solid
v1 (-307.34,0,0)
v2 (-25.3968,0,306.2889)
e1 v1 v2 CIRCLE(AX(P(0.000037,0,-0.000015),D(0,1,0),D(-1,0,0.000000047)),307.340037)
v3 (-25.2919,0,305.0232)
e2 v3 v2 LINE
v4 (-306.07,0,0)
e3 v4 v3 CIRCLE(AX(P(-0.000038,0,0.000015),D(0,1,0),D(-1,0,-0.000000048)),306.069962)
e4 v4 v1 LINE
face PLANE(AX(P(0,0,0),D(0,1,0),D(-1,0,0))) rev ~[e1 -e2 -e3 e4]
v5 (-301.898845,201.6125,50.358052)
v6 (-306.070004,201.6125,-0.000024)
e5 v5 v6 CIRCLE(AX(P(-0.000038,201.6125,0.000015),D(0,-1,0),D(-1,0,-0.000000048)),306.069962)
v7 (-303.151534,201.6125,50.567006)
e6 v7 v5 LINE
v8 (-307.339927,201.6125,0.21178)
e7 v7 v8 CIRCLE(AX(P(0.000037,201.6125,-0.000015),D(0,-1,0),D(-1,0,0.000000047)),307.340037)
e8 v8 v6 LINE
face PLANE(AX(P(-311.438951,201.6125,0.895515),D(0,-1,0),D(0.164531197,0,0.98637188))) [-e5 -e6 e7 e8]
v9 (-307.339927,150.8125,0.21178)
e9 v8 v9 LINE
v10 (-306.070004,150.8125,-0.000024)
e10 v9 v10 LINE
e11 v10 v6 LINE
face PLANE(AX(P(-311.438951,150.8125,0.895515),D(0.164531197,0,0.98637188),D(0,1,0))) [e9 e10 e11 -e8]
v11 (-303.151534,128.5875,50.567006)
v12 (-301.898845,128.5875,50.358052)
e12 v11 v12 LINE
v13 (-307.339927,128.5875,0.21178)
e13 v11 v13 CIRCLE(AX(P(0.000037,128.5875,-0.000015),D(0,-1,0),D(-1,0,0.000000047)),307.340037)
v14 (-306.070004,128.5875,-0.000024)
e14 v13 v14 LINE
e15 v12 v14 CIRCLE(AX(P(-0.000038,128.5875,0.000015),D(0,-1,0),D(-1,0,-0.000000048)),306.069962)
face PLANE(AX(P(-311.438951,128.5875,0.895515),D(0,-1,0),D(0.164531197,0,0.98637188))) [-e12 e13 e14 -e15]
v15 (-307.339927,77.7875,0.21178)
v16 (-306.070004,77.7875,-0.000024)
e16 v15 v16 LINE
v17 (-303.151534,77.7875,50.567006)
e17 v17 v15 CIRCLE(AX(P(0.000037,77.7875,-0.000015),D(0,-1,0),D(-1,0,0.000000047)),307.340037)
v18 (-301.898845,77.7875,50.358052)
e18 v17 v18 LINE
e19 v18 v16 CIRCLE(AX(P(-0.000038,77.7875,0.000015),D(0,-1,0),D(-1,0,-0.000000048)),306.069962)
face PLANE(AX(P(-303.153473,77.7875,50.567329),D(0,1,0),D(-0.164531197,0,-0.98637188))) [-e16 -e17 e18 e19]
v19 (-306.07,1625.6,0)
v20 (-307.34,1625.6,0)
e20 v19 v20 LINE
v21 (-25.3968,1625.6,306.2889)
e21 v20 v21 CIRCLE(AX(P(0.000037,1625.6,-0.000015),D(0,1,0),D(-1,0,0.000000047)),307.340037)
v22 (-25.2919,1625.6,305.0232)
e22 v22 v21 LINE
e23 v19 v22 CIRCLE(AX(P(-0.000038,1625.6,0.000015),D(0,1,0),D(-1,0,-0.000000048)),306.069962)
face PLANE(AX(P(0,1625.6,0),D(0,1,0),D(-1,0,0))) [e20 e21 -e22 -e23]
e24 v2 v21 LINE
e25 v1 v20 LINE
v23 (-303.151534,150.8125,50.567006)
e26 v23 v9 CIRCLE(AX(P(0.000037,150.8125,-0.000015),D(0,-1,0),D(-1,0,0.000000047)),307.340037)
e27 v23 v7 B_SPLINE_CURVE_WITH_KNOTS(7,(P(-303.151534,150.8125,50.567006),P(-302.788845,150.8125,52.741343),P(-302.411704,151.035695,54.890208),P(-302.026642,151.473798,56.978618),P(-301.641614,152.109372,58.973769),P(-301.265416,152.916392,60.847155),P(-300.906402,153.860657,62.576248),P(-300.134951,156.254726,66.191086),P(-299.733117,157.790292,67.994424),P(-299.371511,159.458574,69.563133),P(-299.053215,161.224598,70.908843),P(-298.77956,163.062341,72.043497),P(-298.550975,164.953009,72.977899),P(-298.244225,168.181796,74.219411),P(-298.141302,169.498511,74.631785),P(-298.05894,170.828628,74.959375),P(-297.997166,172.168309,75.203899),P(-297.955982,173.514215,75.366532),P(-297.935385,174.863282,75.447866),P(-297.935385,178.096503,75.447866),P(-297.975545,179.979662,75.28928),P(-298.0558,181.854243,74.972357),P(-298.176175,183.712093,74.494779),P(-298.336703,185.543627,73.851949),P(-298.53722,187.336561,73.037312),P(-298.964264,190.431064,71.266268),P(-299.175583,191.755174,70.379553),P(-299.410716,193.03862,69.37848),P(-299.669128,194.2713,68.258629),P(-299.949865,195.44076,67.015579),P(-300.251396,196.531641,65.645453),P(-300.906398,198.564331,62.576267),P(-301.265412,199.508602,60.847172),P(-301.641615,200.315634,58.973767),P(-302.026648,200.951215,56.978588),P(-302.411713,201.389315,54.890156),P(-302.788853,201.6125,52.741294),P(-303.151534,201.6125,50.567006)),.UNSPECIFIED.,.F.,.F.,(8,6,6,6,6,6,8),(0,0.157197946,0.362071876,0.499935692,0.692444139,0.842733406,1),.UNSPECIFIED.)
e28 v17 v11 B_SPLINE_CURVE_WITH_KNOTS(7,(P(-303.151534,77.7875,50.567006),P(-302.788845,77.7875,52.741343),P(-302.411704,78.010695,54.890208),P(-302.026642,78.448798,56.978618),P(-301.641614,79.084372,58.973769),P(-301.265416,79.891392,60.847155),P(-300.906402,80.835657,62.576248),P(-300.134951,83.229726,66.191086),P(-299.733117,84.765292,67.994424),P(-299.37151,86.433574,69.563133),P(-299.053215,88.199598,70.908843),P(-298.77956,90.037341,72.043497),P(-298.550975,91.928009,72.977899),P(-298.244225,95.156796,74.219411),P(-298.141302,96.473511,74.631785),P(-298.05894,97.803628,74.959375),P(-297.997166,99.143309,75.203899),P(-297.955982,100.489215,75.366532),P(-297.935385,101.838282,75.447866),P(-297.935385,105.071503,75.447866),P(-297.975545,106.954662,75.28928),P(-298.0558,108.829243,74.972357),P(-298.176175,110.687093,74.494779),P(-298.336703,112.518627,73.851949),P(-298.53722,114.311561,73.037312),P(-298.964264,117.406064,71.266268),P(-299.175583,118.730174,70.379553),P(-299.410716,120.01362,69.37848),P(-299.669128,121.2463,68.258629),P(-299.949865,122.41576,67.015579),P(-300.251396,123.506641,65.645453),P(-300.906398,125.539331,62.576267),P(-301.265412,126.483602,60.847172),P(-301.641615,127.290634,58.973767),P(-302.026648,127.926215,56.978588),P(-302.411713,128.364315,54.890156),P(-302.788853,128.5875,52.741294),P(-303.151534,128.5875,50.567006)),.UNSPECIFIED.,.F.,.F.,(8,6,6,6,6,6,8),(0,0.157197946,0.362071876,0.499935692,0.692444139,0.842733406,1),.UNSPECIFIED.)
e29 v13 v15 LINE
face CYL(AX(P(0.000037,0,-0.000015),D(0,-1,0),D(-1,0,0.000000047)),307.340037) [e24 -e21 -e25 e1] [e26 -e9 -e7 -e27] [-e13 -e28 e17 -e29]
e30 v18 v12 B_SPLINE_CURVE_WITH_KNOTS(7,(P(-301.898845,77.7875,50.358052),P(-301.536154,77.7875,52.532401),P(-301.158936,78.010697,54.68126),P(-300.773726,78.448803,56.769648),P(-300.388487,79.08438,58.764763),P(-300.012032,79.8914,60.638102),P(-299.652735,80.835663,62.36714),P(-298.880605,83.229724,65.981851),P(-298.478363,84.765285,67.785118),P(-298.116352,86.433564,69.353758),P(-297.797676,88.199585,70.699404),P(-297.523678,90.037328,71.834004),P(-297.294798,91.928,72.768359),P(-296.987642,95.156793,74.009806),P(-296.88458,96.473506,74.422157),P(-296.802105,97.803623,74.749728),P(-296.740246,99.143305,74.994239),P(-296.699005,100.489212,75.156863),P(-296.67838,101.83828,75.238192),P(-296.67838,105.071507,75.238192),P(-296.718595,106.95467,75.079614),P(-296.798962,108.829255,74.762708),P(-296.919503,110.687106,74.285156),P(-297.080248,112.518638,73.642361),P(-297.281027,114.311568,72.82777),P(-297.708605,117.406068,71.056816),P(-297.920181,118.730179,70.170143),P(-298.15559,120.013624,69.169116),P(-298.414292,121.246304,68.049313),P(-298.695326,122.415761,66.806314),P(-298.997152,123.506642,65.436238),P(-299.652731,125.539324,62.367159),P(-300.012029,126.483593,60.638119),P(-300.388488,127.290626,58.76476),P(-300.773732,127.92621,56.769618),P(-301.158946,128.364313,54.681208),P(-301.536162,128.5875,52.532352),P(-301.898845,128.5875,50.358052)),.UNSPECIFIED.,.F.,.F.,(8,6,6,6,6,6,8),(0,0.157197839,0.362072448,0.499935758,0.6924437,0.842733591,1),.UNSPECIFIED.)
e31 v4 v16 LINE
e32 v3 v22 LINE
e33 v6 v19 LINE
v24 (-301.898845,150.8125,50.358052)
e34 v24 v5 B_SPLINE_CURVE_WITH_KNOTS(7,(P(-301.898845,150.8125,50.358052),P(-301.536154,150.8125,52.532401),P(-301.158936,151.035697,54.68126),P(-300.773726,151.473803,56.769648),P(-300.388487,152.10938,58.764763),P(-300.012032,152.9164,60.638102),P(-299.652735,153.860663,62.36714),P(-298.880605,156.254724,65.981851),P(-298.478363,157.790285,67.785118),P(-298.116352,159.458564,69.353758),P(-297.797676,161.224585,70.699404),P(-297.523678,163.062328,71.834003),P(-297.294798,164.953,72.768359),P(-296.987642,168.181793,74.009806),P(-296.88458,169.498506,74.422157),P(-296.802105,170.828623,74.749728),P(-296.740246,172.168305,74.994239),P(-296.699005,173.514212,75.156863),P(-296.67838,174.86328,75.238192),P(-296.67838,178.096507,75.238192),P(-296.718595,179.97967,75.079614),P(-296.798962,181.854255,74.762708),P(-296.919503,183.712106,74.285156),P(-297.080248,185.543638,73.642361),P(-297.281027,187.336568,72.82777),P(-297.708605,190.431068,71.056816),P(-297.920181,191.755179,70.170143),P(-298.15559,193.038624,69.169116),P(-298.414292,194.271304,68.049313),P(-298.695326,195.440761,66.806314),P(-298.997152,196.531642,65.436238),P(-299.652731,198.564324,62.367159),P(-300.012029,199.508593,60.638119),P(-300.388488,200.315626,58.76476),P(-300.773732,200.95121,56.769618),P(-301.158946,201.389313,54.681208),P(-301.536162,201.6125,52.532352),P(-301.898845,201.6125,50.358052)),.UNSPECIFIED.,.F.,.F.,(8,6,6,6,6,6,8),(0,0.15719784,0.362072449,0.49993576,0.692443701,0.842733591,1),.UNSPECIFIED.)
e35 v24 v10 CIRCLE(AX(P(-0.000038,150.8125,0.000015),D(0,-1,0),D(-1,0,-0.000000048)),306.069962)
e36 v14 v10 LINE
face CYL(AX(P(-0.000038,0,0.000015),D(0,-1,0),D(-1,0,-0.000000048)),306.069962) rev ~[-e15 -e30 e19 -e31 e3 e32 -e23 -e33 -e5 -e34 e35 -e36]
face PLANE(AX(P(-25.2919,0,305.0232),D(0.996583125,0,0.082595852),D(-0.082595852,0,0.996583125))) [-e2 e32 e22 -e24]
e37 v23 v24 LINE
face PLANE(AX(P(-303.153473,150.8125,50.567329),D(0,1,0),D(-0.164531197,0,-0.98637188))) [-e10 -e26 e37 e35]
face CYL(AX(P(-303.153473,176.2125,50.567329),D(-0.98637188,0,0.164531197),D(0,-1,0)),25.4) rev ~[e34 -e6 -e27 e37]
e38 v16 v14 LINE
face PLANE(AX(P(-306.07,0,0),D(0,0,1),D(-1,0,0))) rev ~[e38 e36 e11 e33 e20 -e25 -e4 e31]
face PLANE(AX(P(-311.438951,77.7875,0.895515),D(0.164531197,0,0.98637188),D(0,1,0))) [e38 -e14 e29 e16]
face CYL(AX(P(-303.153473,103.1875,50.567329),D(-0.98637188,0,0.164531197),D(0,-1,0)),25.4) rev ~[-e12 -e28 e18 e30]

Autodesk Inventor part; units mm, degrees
ref_plane "YZ Plane" through (0, 0, 0) normal (1, 0, 0) x (0, 1, 0)
ref_plane "XZ Plane" through (0, 0, 0) normal (0, 1, 0) x (-1, 0, 0)
sketch "Sketch1" plane through (0, 0, 0) normal (0, 1, 0) x (-1, 0, 0)
  arc A0 (307.34, 0) -> (25.3968, 306.2889) centre (0, 0) ccw
  line L0 (0, 0) -> (25.3968, 306.2889) construction
  line L1 (0, 0) -> (307.34, 0) construction
  arc A1 (306.07, 0) -> (25.2919, 305.0232) centre (0, 0) ccw
  line L2 (0, 0) -> (25.2919, 305.0232) construction
  line L3 (0, 0) -> (306.07, 0) construction
  line L4 (306.07, 0) -> (307.34, 0)
  line L5 (25.2919, 305.0232) -> (25.3968, 306.2889)
  dimension "d0" = 307.34
  dimension "d1" = 85.26
  dimension "d2" = 306.07
  dimension "d3" = 85.26
extrude "Extrusion1" add sketch "Sketch1" along normal blind 1625.6
sketch "Sketch2" plane through (0, 0, 0) normal (0, 1, 0) x (-1, 0, 0)
  arc A0 (307.34, 0) -> (303.1515, 50.567) centre (0, 0) ccw
  line L0 (0, 0) -> (303.1515, 50.567) construction
  line L1 (0, 0) -> (307.34, 0) construction
  arc A1 (307.34, 0) -> (290.6829, 99.8065) centre (0, 0) ccw
  line L2 (0, 0) -> (290.6829, 99.8065) construction
  line L3 (0, 0) -> (307.34, 0) construction
  arc A2 (123.4855, 281.4413) -> (25.3968, 306.2889) centre (0, 0) ccw
  line L4 (0, 0) -> (123.4855, 281.4413) construction
  line L5 (0, 0) -> (25.3968, 306.2889) construction
  dimension "d6" = 307.34
  dimension "d7" = 9.47
  dimension "d14" = 18.95
  dimension "d15" = 18.95
ref_plane "Work Plane1" through (-303.1515, 0, 50.567) normal (-0.9863719, 0, 0.1645312) x (0, -1, 0)
sketch "Sketch3" plane through (-303.1515, 0, 50.567) normal (-0.9863719, 0, 0.1645312) x (0, -1, 0)
  circle A0 centre (-103.1875, 0) radius 25.4
  line L0 (0, 297.9362) -> (0, -50.567) projected
  line L1 (0, -50.3581) -> (-1625.6, -50.3581) projected
  line L2 (-128.5875, 0) -> (-77.7875, 0)
  line L3 (-77.7875, 0) -> (-77.7875, -50.3581)
  line L4 (-77.7875, -50.3581) -> (-128.5875, -50.3581)
  line L5 (-128.5875, -50.3581) -> (-128.5875, 0)
  circle A1 centre (-176.2125, 0) radius 25.4
  line L6 (-201.6125, 0) -> (-150.8125, 0)
  line L7 (-150.8125, 0) -> (-150.8125, -50.3581)
  line L8 (-150.8125, -50.3581) -> (-201.6125, -50.3581)
  line L9 (-201.6125, -50.3581) -> (-201.6125, 0)
  point P0 (0, 0)
  dimension "d8" = 50.8
  dimension "d10" = 50.8
  dimension "d9" = 103.1875
  dimension "d11" = 176.2125
extrude "Extrusion2" cut sketch "Sketch3" against normal blind 25.4
properties part number "EDM Middle Shield Part 4"
